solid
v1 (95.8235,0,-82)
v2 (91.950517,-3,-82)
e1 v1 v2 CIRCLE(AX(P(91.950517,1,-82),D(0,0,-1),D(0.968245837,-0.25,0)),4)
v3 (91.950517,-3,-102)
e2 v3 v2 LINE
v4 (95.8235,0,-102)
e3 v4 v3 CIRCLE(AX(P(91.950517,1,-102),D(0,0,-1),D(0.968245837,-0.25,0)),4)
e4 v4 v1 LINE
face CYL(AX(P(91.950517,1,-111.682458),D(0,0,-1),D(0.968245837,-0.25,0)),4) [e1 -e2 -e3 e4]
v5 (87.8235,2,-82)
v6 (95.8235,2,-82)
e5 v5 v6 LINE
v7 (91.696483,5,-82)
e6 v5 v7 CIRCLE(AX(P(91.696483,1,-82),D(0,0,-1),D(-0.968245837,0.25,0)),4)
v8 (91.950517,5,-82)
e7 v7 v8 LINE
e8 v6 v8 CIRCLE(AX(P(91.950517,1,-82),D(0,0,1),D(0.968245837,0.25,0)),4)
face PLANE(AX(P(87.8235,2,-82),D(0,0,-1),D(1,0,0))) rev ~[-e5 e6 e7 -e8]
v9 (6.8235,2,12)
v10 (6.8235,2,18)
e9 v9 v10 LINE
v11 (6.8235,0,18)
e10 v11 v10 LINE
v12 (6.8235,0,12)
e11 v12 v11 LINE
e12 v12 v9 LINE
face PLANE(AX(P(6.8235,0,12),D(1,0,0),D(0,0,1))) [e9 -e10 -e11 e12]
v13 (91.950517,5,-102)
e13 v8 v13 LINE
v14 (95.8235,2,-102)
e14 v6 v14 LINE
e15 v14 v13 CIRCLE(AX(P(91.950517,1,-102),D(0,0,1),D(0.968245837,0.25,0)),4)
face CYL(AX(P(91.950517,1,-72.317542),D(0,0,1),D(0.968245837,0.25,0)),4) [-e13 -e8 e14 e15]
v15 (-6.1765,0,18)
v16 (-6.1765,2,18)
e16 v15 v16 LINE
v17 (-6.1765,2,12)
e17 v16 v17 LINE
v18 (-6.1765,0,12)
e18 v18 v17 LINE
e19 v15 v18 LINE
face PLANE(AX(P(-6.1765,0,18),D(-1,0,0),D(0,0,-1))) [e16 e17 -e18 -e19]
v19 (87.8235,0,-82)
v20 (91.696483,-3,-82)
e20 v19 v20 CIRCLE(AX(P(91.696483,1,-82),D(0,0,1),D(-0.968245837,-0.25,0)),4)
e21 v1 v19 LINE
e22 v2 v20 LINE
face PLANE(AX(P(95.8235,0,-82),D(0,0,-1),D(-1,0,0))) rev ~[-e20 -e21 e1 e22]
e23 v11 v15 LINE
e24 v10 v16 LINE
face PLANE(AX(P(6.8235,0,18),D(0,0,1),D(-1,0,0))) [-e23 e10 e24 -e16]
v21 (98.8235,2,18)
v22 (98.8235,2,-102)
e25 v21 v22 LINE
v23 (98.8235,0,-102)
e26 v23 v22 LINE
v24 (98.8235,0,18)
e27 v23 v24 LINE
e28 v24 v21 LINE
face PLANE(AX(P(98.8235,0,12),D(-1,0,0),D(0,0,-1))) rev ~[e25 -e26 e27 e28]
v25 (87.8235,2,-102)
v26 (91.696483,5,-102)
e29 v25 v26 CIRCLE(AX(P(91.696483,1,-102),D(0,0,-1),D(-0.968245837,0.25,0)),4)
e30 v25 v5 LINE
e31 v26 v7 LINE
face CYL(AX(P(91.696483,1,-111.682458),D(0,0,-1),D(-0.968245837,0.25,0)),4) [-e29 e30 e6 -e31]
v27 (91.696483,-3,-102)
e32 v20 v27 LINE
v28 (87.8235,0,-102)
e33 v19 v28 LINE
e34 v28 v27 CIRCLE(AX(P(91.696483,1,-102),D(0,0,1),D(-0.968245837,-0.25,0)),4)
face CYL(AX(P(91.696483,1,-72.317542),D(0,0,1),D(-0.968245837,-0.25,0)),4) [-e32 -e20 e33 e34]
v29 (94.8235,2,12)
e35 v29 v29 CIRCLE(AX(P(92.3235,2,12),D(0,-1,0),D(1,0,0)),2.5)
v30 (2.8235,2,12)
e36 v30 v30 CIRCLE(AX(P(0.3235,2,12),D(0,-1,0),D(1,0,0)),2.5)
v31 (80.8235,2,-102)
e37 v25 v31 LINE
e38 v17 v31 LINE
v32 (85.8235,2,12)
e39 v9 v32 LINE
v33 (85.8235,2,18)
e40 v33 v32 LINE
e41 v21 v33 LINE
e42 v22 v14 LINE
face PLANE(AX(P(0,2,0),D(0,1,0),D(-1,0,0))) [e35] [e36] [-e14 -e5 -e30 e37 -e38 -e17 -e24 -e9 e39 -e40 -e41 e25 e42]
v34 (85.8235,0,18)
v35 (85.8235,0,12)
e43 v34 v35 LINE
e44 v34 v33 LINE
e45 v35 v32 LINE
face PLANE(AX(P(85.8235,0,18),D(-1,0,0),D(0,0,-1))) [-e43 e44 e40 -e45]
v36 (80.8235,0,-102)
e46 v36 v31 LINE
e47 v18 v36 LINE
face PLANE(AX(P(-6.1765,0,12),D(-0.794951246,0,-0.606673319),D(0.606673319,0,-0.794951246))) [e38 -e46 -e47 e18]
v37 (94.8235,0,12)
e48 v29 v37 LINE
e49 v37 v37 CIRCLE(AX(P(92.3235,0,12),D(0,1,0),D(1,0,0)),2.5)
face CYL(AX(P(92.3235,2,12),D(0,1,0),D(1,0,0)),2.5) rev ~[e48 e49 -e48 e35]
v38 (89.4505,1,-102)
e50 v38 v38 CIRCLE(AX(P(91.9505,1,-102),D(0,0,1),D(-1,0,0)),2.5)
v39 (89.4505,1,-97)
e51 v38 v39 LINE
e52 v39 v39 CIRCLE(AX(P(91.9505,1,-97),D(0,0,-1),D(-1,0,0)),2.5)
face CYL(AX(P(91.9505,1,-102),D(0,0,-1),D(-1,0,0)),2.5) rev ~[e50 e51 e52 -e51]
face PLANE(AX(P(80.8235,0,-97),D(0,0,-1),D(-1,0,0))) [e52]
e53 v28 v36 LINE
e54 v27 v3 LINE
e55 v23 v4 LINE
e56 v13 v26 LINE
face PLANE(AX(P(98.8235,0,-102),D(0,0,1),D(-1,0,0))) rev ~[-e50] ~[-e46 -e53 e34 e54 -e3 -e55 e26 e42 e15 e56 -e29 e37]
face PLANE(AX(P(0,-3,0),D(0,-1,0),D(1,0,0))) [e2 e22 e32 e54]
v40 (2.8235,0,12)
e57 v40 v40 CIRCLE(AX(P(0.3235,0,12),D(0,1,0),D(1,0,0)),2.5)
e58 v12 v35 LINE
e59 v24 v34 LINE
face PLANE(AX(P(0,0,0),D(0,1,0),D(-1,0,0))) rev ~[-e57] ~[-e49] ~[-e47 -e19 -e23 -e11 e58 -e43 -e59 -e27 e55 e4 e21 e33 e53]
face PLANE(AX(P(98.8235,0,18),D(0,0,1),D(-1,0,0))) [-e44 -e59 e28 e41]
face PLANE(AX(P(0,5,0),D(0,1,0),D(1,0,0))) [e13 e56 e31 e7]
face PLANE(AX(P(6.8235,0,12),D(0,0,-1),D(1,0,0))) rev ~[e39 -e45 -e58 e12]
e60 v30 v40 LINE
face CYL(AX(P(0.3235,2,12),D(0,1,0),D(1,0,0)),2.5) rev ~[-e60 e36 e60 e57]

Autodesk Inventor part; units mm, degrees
ref_plane "YZ Plane" through (0, 0, 0) normal (1, 0, 0) x (0, 1, 0)
ref_plane "XZ Plane" through (0, 0, 0) normal (0, 1, 0) x (-1, 0, 0)
ref_plane "XY Plane" through (0, 0, 0) normal (0, 0, 1) x (1, 0, 0)
sketch "Sketch1" plane through (0, 0, 0) normal (0, 1, 0) x (-1, 0, 0)
  line L0 (6.1765, 12) -> (-98.8235, 12)
  line L1 (-98.8235, 12) -> (-98.8235, -102)
  line L2 (-6.8235, 12) -> (-6.8235, 18)
  line L3 (-6.8235, 18) -> (6.1765, 18)
  line L4 (6.1765, 18) -> (6.1765, 12)
  line L5 (-98.8235, 12) -> (-98.8235, 18)
  line L6 (-98.8235, 18) -> (-85.8235, 18)
  line L7 (-85.8235, 18) -> (-85.8235, 12)
  line L8 (-98.8235, -102) -> (-85.8235, -87.8857)
  line L9 (-6.8235, -2.1143) -> (6.1765, 12)
  line L10 (-98.8235, -102) -> (-80.8235, -102)
  line L11 (6.1765, 12) -> (-80.8235, -102)
  point P0 (0, 0)
  point P1 (-96.8235, 18)
  point P2 (-96.8235, 18)
  dimension "d0" = 114
  dimension "d1" = 105
  dimension "d2" = 13
  dimension "d3" = 6
  dimension "d4" = 13
  dimension "d5" = 6
  dimension "d6" = 18
extrude "Extrusion1" add sketch "Sketch1" along normal blind 2
sketch "Sketch2" plane through (0, 2, 0) normal (0, 1, 0) x (1, 0, 0)
  line L0 (98.8235, 102) -> (80.8235, 102) projected
  line L1 (95.8235, 102) -> (87.8235, 102)
  line L2 (87.8235, 102) -> (87.8235, 82)
  line L3 (87.8235, 82) -> (95.8235, 82)
  line L4 (95.8235, 82) -> (95.8235, 102)
  line L5 (98.8235, -18) -> (98.8235, 102) projected
  point P0 (0, 0)
  dimension "d9" = 20
  dimension "d10" = 8
  dimension "d11" = 3
extrude "Extrusion2" add sketch "Sketch2" along normal blind 3
fillet "Fillet1" radius 4 2 edges at (87.8235, 5, -92) (95.8235, 5, -92)
sketch "Sketch3" plane through (0, 0, 0) normal (0, -1, 0) x (1, 0, 0)
  line L0 (87.8235, -102) -> (80.8235, -102) projected
  line L1 (87.8235, -102) -> (95.8235, -102)
  line L2 (95.8235, -102) -> (95.8235, -82)
  line L3 (95.8235, -82) -> (87.8235, -82)
  line L4 (87.8235, -82) -> (87.8235, -102)
  line L5 (98.8235, 18) -> (98.8235, -102) projected
  point P0 (0, 0)
  dimension "d16" = 20
  dimension "d17" = 8
  dimension "d18" = 3
extrude "Extrusion3" add sketch "Sketch3" along normal blind 3
fillet "Fillet3" radius 4 2 edges at (87.8235, -3, -92) (95.8235, -3, -92)
sketch "Sketch4" plane through (80.8235, 0, -102) normal (0, 0, -1) x (-1, 0, 0)
  arc A0 (-15, 0) -> (-11.127, -3) centre (-11.127, 1) ccw projected
  line L0 (-11.127, 4.8105) -> (-11.127, -3)
  circle A1 centre (-11.127, 1) radius 2.5
  point P0 (80.8235, 0)
  dimension "d25" = 5
extrude "Extrusion4" cut sketch "Sketch4" against normal blind 5
sketch "Sketch5" plane through (0, 2, 0) normal (0, 1, 0) x (1, 0, 0)
  line L0 (85.8235, -12) -> (85.8235, -18) projected
  line L1 (85.8235, -12) -> (98.8235, -12)
  line L2 (98.8235, -18) -> (98.8235, 102) projected
  circle A0 centre (92.3235, -12) radius 2.5
  point P0 (0, 0)
  dimension "d26" = 5
extrude "Extrusion5" cut sketch "Sketch5" against normal blind 2
sketch "Sketch6" plane through (0, 2, 0) normal (0, 1, 0) x (1, 0, 0)
  line L0 (-6.1765, -12) -> (-6.1765, -18) projected
  line L1 (6.8235, -18) -> (6.8235, -12) projected
  line L2 (-6.1765, -12) -> (6.8235, -12)
  circle A0 centre (0.3235, -12) radius 2.5
  point P0 (0, 0)
  dimension "d29" = 5
  dimension "d32" = 6.5
  dimension "d33" = 6
extrude "Extrusion6" cut sketch "Sketch6" against normal blind 2
equation "\"d23\" = d22"
equation "\"d22\" = 5"
properties part number "Triangle"
